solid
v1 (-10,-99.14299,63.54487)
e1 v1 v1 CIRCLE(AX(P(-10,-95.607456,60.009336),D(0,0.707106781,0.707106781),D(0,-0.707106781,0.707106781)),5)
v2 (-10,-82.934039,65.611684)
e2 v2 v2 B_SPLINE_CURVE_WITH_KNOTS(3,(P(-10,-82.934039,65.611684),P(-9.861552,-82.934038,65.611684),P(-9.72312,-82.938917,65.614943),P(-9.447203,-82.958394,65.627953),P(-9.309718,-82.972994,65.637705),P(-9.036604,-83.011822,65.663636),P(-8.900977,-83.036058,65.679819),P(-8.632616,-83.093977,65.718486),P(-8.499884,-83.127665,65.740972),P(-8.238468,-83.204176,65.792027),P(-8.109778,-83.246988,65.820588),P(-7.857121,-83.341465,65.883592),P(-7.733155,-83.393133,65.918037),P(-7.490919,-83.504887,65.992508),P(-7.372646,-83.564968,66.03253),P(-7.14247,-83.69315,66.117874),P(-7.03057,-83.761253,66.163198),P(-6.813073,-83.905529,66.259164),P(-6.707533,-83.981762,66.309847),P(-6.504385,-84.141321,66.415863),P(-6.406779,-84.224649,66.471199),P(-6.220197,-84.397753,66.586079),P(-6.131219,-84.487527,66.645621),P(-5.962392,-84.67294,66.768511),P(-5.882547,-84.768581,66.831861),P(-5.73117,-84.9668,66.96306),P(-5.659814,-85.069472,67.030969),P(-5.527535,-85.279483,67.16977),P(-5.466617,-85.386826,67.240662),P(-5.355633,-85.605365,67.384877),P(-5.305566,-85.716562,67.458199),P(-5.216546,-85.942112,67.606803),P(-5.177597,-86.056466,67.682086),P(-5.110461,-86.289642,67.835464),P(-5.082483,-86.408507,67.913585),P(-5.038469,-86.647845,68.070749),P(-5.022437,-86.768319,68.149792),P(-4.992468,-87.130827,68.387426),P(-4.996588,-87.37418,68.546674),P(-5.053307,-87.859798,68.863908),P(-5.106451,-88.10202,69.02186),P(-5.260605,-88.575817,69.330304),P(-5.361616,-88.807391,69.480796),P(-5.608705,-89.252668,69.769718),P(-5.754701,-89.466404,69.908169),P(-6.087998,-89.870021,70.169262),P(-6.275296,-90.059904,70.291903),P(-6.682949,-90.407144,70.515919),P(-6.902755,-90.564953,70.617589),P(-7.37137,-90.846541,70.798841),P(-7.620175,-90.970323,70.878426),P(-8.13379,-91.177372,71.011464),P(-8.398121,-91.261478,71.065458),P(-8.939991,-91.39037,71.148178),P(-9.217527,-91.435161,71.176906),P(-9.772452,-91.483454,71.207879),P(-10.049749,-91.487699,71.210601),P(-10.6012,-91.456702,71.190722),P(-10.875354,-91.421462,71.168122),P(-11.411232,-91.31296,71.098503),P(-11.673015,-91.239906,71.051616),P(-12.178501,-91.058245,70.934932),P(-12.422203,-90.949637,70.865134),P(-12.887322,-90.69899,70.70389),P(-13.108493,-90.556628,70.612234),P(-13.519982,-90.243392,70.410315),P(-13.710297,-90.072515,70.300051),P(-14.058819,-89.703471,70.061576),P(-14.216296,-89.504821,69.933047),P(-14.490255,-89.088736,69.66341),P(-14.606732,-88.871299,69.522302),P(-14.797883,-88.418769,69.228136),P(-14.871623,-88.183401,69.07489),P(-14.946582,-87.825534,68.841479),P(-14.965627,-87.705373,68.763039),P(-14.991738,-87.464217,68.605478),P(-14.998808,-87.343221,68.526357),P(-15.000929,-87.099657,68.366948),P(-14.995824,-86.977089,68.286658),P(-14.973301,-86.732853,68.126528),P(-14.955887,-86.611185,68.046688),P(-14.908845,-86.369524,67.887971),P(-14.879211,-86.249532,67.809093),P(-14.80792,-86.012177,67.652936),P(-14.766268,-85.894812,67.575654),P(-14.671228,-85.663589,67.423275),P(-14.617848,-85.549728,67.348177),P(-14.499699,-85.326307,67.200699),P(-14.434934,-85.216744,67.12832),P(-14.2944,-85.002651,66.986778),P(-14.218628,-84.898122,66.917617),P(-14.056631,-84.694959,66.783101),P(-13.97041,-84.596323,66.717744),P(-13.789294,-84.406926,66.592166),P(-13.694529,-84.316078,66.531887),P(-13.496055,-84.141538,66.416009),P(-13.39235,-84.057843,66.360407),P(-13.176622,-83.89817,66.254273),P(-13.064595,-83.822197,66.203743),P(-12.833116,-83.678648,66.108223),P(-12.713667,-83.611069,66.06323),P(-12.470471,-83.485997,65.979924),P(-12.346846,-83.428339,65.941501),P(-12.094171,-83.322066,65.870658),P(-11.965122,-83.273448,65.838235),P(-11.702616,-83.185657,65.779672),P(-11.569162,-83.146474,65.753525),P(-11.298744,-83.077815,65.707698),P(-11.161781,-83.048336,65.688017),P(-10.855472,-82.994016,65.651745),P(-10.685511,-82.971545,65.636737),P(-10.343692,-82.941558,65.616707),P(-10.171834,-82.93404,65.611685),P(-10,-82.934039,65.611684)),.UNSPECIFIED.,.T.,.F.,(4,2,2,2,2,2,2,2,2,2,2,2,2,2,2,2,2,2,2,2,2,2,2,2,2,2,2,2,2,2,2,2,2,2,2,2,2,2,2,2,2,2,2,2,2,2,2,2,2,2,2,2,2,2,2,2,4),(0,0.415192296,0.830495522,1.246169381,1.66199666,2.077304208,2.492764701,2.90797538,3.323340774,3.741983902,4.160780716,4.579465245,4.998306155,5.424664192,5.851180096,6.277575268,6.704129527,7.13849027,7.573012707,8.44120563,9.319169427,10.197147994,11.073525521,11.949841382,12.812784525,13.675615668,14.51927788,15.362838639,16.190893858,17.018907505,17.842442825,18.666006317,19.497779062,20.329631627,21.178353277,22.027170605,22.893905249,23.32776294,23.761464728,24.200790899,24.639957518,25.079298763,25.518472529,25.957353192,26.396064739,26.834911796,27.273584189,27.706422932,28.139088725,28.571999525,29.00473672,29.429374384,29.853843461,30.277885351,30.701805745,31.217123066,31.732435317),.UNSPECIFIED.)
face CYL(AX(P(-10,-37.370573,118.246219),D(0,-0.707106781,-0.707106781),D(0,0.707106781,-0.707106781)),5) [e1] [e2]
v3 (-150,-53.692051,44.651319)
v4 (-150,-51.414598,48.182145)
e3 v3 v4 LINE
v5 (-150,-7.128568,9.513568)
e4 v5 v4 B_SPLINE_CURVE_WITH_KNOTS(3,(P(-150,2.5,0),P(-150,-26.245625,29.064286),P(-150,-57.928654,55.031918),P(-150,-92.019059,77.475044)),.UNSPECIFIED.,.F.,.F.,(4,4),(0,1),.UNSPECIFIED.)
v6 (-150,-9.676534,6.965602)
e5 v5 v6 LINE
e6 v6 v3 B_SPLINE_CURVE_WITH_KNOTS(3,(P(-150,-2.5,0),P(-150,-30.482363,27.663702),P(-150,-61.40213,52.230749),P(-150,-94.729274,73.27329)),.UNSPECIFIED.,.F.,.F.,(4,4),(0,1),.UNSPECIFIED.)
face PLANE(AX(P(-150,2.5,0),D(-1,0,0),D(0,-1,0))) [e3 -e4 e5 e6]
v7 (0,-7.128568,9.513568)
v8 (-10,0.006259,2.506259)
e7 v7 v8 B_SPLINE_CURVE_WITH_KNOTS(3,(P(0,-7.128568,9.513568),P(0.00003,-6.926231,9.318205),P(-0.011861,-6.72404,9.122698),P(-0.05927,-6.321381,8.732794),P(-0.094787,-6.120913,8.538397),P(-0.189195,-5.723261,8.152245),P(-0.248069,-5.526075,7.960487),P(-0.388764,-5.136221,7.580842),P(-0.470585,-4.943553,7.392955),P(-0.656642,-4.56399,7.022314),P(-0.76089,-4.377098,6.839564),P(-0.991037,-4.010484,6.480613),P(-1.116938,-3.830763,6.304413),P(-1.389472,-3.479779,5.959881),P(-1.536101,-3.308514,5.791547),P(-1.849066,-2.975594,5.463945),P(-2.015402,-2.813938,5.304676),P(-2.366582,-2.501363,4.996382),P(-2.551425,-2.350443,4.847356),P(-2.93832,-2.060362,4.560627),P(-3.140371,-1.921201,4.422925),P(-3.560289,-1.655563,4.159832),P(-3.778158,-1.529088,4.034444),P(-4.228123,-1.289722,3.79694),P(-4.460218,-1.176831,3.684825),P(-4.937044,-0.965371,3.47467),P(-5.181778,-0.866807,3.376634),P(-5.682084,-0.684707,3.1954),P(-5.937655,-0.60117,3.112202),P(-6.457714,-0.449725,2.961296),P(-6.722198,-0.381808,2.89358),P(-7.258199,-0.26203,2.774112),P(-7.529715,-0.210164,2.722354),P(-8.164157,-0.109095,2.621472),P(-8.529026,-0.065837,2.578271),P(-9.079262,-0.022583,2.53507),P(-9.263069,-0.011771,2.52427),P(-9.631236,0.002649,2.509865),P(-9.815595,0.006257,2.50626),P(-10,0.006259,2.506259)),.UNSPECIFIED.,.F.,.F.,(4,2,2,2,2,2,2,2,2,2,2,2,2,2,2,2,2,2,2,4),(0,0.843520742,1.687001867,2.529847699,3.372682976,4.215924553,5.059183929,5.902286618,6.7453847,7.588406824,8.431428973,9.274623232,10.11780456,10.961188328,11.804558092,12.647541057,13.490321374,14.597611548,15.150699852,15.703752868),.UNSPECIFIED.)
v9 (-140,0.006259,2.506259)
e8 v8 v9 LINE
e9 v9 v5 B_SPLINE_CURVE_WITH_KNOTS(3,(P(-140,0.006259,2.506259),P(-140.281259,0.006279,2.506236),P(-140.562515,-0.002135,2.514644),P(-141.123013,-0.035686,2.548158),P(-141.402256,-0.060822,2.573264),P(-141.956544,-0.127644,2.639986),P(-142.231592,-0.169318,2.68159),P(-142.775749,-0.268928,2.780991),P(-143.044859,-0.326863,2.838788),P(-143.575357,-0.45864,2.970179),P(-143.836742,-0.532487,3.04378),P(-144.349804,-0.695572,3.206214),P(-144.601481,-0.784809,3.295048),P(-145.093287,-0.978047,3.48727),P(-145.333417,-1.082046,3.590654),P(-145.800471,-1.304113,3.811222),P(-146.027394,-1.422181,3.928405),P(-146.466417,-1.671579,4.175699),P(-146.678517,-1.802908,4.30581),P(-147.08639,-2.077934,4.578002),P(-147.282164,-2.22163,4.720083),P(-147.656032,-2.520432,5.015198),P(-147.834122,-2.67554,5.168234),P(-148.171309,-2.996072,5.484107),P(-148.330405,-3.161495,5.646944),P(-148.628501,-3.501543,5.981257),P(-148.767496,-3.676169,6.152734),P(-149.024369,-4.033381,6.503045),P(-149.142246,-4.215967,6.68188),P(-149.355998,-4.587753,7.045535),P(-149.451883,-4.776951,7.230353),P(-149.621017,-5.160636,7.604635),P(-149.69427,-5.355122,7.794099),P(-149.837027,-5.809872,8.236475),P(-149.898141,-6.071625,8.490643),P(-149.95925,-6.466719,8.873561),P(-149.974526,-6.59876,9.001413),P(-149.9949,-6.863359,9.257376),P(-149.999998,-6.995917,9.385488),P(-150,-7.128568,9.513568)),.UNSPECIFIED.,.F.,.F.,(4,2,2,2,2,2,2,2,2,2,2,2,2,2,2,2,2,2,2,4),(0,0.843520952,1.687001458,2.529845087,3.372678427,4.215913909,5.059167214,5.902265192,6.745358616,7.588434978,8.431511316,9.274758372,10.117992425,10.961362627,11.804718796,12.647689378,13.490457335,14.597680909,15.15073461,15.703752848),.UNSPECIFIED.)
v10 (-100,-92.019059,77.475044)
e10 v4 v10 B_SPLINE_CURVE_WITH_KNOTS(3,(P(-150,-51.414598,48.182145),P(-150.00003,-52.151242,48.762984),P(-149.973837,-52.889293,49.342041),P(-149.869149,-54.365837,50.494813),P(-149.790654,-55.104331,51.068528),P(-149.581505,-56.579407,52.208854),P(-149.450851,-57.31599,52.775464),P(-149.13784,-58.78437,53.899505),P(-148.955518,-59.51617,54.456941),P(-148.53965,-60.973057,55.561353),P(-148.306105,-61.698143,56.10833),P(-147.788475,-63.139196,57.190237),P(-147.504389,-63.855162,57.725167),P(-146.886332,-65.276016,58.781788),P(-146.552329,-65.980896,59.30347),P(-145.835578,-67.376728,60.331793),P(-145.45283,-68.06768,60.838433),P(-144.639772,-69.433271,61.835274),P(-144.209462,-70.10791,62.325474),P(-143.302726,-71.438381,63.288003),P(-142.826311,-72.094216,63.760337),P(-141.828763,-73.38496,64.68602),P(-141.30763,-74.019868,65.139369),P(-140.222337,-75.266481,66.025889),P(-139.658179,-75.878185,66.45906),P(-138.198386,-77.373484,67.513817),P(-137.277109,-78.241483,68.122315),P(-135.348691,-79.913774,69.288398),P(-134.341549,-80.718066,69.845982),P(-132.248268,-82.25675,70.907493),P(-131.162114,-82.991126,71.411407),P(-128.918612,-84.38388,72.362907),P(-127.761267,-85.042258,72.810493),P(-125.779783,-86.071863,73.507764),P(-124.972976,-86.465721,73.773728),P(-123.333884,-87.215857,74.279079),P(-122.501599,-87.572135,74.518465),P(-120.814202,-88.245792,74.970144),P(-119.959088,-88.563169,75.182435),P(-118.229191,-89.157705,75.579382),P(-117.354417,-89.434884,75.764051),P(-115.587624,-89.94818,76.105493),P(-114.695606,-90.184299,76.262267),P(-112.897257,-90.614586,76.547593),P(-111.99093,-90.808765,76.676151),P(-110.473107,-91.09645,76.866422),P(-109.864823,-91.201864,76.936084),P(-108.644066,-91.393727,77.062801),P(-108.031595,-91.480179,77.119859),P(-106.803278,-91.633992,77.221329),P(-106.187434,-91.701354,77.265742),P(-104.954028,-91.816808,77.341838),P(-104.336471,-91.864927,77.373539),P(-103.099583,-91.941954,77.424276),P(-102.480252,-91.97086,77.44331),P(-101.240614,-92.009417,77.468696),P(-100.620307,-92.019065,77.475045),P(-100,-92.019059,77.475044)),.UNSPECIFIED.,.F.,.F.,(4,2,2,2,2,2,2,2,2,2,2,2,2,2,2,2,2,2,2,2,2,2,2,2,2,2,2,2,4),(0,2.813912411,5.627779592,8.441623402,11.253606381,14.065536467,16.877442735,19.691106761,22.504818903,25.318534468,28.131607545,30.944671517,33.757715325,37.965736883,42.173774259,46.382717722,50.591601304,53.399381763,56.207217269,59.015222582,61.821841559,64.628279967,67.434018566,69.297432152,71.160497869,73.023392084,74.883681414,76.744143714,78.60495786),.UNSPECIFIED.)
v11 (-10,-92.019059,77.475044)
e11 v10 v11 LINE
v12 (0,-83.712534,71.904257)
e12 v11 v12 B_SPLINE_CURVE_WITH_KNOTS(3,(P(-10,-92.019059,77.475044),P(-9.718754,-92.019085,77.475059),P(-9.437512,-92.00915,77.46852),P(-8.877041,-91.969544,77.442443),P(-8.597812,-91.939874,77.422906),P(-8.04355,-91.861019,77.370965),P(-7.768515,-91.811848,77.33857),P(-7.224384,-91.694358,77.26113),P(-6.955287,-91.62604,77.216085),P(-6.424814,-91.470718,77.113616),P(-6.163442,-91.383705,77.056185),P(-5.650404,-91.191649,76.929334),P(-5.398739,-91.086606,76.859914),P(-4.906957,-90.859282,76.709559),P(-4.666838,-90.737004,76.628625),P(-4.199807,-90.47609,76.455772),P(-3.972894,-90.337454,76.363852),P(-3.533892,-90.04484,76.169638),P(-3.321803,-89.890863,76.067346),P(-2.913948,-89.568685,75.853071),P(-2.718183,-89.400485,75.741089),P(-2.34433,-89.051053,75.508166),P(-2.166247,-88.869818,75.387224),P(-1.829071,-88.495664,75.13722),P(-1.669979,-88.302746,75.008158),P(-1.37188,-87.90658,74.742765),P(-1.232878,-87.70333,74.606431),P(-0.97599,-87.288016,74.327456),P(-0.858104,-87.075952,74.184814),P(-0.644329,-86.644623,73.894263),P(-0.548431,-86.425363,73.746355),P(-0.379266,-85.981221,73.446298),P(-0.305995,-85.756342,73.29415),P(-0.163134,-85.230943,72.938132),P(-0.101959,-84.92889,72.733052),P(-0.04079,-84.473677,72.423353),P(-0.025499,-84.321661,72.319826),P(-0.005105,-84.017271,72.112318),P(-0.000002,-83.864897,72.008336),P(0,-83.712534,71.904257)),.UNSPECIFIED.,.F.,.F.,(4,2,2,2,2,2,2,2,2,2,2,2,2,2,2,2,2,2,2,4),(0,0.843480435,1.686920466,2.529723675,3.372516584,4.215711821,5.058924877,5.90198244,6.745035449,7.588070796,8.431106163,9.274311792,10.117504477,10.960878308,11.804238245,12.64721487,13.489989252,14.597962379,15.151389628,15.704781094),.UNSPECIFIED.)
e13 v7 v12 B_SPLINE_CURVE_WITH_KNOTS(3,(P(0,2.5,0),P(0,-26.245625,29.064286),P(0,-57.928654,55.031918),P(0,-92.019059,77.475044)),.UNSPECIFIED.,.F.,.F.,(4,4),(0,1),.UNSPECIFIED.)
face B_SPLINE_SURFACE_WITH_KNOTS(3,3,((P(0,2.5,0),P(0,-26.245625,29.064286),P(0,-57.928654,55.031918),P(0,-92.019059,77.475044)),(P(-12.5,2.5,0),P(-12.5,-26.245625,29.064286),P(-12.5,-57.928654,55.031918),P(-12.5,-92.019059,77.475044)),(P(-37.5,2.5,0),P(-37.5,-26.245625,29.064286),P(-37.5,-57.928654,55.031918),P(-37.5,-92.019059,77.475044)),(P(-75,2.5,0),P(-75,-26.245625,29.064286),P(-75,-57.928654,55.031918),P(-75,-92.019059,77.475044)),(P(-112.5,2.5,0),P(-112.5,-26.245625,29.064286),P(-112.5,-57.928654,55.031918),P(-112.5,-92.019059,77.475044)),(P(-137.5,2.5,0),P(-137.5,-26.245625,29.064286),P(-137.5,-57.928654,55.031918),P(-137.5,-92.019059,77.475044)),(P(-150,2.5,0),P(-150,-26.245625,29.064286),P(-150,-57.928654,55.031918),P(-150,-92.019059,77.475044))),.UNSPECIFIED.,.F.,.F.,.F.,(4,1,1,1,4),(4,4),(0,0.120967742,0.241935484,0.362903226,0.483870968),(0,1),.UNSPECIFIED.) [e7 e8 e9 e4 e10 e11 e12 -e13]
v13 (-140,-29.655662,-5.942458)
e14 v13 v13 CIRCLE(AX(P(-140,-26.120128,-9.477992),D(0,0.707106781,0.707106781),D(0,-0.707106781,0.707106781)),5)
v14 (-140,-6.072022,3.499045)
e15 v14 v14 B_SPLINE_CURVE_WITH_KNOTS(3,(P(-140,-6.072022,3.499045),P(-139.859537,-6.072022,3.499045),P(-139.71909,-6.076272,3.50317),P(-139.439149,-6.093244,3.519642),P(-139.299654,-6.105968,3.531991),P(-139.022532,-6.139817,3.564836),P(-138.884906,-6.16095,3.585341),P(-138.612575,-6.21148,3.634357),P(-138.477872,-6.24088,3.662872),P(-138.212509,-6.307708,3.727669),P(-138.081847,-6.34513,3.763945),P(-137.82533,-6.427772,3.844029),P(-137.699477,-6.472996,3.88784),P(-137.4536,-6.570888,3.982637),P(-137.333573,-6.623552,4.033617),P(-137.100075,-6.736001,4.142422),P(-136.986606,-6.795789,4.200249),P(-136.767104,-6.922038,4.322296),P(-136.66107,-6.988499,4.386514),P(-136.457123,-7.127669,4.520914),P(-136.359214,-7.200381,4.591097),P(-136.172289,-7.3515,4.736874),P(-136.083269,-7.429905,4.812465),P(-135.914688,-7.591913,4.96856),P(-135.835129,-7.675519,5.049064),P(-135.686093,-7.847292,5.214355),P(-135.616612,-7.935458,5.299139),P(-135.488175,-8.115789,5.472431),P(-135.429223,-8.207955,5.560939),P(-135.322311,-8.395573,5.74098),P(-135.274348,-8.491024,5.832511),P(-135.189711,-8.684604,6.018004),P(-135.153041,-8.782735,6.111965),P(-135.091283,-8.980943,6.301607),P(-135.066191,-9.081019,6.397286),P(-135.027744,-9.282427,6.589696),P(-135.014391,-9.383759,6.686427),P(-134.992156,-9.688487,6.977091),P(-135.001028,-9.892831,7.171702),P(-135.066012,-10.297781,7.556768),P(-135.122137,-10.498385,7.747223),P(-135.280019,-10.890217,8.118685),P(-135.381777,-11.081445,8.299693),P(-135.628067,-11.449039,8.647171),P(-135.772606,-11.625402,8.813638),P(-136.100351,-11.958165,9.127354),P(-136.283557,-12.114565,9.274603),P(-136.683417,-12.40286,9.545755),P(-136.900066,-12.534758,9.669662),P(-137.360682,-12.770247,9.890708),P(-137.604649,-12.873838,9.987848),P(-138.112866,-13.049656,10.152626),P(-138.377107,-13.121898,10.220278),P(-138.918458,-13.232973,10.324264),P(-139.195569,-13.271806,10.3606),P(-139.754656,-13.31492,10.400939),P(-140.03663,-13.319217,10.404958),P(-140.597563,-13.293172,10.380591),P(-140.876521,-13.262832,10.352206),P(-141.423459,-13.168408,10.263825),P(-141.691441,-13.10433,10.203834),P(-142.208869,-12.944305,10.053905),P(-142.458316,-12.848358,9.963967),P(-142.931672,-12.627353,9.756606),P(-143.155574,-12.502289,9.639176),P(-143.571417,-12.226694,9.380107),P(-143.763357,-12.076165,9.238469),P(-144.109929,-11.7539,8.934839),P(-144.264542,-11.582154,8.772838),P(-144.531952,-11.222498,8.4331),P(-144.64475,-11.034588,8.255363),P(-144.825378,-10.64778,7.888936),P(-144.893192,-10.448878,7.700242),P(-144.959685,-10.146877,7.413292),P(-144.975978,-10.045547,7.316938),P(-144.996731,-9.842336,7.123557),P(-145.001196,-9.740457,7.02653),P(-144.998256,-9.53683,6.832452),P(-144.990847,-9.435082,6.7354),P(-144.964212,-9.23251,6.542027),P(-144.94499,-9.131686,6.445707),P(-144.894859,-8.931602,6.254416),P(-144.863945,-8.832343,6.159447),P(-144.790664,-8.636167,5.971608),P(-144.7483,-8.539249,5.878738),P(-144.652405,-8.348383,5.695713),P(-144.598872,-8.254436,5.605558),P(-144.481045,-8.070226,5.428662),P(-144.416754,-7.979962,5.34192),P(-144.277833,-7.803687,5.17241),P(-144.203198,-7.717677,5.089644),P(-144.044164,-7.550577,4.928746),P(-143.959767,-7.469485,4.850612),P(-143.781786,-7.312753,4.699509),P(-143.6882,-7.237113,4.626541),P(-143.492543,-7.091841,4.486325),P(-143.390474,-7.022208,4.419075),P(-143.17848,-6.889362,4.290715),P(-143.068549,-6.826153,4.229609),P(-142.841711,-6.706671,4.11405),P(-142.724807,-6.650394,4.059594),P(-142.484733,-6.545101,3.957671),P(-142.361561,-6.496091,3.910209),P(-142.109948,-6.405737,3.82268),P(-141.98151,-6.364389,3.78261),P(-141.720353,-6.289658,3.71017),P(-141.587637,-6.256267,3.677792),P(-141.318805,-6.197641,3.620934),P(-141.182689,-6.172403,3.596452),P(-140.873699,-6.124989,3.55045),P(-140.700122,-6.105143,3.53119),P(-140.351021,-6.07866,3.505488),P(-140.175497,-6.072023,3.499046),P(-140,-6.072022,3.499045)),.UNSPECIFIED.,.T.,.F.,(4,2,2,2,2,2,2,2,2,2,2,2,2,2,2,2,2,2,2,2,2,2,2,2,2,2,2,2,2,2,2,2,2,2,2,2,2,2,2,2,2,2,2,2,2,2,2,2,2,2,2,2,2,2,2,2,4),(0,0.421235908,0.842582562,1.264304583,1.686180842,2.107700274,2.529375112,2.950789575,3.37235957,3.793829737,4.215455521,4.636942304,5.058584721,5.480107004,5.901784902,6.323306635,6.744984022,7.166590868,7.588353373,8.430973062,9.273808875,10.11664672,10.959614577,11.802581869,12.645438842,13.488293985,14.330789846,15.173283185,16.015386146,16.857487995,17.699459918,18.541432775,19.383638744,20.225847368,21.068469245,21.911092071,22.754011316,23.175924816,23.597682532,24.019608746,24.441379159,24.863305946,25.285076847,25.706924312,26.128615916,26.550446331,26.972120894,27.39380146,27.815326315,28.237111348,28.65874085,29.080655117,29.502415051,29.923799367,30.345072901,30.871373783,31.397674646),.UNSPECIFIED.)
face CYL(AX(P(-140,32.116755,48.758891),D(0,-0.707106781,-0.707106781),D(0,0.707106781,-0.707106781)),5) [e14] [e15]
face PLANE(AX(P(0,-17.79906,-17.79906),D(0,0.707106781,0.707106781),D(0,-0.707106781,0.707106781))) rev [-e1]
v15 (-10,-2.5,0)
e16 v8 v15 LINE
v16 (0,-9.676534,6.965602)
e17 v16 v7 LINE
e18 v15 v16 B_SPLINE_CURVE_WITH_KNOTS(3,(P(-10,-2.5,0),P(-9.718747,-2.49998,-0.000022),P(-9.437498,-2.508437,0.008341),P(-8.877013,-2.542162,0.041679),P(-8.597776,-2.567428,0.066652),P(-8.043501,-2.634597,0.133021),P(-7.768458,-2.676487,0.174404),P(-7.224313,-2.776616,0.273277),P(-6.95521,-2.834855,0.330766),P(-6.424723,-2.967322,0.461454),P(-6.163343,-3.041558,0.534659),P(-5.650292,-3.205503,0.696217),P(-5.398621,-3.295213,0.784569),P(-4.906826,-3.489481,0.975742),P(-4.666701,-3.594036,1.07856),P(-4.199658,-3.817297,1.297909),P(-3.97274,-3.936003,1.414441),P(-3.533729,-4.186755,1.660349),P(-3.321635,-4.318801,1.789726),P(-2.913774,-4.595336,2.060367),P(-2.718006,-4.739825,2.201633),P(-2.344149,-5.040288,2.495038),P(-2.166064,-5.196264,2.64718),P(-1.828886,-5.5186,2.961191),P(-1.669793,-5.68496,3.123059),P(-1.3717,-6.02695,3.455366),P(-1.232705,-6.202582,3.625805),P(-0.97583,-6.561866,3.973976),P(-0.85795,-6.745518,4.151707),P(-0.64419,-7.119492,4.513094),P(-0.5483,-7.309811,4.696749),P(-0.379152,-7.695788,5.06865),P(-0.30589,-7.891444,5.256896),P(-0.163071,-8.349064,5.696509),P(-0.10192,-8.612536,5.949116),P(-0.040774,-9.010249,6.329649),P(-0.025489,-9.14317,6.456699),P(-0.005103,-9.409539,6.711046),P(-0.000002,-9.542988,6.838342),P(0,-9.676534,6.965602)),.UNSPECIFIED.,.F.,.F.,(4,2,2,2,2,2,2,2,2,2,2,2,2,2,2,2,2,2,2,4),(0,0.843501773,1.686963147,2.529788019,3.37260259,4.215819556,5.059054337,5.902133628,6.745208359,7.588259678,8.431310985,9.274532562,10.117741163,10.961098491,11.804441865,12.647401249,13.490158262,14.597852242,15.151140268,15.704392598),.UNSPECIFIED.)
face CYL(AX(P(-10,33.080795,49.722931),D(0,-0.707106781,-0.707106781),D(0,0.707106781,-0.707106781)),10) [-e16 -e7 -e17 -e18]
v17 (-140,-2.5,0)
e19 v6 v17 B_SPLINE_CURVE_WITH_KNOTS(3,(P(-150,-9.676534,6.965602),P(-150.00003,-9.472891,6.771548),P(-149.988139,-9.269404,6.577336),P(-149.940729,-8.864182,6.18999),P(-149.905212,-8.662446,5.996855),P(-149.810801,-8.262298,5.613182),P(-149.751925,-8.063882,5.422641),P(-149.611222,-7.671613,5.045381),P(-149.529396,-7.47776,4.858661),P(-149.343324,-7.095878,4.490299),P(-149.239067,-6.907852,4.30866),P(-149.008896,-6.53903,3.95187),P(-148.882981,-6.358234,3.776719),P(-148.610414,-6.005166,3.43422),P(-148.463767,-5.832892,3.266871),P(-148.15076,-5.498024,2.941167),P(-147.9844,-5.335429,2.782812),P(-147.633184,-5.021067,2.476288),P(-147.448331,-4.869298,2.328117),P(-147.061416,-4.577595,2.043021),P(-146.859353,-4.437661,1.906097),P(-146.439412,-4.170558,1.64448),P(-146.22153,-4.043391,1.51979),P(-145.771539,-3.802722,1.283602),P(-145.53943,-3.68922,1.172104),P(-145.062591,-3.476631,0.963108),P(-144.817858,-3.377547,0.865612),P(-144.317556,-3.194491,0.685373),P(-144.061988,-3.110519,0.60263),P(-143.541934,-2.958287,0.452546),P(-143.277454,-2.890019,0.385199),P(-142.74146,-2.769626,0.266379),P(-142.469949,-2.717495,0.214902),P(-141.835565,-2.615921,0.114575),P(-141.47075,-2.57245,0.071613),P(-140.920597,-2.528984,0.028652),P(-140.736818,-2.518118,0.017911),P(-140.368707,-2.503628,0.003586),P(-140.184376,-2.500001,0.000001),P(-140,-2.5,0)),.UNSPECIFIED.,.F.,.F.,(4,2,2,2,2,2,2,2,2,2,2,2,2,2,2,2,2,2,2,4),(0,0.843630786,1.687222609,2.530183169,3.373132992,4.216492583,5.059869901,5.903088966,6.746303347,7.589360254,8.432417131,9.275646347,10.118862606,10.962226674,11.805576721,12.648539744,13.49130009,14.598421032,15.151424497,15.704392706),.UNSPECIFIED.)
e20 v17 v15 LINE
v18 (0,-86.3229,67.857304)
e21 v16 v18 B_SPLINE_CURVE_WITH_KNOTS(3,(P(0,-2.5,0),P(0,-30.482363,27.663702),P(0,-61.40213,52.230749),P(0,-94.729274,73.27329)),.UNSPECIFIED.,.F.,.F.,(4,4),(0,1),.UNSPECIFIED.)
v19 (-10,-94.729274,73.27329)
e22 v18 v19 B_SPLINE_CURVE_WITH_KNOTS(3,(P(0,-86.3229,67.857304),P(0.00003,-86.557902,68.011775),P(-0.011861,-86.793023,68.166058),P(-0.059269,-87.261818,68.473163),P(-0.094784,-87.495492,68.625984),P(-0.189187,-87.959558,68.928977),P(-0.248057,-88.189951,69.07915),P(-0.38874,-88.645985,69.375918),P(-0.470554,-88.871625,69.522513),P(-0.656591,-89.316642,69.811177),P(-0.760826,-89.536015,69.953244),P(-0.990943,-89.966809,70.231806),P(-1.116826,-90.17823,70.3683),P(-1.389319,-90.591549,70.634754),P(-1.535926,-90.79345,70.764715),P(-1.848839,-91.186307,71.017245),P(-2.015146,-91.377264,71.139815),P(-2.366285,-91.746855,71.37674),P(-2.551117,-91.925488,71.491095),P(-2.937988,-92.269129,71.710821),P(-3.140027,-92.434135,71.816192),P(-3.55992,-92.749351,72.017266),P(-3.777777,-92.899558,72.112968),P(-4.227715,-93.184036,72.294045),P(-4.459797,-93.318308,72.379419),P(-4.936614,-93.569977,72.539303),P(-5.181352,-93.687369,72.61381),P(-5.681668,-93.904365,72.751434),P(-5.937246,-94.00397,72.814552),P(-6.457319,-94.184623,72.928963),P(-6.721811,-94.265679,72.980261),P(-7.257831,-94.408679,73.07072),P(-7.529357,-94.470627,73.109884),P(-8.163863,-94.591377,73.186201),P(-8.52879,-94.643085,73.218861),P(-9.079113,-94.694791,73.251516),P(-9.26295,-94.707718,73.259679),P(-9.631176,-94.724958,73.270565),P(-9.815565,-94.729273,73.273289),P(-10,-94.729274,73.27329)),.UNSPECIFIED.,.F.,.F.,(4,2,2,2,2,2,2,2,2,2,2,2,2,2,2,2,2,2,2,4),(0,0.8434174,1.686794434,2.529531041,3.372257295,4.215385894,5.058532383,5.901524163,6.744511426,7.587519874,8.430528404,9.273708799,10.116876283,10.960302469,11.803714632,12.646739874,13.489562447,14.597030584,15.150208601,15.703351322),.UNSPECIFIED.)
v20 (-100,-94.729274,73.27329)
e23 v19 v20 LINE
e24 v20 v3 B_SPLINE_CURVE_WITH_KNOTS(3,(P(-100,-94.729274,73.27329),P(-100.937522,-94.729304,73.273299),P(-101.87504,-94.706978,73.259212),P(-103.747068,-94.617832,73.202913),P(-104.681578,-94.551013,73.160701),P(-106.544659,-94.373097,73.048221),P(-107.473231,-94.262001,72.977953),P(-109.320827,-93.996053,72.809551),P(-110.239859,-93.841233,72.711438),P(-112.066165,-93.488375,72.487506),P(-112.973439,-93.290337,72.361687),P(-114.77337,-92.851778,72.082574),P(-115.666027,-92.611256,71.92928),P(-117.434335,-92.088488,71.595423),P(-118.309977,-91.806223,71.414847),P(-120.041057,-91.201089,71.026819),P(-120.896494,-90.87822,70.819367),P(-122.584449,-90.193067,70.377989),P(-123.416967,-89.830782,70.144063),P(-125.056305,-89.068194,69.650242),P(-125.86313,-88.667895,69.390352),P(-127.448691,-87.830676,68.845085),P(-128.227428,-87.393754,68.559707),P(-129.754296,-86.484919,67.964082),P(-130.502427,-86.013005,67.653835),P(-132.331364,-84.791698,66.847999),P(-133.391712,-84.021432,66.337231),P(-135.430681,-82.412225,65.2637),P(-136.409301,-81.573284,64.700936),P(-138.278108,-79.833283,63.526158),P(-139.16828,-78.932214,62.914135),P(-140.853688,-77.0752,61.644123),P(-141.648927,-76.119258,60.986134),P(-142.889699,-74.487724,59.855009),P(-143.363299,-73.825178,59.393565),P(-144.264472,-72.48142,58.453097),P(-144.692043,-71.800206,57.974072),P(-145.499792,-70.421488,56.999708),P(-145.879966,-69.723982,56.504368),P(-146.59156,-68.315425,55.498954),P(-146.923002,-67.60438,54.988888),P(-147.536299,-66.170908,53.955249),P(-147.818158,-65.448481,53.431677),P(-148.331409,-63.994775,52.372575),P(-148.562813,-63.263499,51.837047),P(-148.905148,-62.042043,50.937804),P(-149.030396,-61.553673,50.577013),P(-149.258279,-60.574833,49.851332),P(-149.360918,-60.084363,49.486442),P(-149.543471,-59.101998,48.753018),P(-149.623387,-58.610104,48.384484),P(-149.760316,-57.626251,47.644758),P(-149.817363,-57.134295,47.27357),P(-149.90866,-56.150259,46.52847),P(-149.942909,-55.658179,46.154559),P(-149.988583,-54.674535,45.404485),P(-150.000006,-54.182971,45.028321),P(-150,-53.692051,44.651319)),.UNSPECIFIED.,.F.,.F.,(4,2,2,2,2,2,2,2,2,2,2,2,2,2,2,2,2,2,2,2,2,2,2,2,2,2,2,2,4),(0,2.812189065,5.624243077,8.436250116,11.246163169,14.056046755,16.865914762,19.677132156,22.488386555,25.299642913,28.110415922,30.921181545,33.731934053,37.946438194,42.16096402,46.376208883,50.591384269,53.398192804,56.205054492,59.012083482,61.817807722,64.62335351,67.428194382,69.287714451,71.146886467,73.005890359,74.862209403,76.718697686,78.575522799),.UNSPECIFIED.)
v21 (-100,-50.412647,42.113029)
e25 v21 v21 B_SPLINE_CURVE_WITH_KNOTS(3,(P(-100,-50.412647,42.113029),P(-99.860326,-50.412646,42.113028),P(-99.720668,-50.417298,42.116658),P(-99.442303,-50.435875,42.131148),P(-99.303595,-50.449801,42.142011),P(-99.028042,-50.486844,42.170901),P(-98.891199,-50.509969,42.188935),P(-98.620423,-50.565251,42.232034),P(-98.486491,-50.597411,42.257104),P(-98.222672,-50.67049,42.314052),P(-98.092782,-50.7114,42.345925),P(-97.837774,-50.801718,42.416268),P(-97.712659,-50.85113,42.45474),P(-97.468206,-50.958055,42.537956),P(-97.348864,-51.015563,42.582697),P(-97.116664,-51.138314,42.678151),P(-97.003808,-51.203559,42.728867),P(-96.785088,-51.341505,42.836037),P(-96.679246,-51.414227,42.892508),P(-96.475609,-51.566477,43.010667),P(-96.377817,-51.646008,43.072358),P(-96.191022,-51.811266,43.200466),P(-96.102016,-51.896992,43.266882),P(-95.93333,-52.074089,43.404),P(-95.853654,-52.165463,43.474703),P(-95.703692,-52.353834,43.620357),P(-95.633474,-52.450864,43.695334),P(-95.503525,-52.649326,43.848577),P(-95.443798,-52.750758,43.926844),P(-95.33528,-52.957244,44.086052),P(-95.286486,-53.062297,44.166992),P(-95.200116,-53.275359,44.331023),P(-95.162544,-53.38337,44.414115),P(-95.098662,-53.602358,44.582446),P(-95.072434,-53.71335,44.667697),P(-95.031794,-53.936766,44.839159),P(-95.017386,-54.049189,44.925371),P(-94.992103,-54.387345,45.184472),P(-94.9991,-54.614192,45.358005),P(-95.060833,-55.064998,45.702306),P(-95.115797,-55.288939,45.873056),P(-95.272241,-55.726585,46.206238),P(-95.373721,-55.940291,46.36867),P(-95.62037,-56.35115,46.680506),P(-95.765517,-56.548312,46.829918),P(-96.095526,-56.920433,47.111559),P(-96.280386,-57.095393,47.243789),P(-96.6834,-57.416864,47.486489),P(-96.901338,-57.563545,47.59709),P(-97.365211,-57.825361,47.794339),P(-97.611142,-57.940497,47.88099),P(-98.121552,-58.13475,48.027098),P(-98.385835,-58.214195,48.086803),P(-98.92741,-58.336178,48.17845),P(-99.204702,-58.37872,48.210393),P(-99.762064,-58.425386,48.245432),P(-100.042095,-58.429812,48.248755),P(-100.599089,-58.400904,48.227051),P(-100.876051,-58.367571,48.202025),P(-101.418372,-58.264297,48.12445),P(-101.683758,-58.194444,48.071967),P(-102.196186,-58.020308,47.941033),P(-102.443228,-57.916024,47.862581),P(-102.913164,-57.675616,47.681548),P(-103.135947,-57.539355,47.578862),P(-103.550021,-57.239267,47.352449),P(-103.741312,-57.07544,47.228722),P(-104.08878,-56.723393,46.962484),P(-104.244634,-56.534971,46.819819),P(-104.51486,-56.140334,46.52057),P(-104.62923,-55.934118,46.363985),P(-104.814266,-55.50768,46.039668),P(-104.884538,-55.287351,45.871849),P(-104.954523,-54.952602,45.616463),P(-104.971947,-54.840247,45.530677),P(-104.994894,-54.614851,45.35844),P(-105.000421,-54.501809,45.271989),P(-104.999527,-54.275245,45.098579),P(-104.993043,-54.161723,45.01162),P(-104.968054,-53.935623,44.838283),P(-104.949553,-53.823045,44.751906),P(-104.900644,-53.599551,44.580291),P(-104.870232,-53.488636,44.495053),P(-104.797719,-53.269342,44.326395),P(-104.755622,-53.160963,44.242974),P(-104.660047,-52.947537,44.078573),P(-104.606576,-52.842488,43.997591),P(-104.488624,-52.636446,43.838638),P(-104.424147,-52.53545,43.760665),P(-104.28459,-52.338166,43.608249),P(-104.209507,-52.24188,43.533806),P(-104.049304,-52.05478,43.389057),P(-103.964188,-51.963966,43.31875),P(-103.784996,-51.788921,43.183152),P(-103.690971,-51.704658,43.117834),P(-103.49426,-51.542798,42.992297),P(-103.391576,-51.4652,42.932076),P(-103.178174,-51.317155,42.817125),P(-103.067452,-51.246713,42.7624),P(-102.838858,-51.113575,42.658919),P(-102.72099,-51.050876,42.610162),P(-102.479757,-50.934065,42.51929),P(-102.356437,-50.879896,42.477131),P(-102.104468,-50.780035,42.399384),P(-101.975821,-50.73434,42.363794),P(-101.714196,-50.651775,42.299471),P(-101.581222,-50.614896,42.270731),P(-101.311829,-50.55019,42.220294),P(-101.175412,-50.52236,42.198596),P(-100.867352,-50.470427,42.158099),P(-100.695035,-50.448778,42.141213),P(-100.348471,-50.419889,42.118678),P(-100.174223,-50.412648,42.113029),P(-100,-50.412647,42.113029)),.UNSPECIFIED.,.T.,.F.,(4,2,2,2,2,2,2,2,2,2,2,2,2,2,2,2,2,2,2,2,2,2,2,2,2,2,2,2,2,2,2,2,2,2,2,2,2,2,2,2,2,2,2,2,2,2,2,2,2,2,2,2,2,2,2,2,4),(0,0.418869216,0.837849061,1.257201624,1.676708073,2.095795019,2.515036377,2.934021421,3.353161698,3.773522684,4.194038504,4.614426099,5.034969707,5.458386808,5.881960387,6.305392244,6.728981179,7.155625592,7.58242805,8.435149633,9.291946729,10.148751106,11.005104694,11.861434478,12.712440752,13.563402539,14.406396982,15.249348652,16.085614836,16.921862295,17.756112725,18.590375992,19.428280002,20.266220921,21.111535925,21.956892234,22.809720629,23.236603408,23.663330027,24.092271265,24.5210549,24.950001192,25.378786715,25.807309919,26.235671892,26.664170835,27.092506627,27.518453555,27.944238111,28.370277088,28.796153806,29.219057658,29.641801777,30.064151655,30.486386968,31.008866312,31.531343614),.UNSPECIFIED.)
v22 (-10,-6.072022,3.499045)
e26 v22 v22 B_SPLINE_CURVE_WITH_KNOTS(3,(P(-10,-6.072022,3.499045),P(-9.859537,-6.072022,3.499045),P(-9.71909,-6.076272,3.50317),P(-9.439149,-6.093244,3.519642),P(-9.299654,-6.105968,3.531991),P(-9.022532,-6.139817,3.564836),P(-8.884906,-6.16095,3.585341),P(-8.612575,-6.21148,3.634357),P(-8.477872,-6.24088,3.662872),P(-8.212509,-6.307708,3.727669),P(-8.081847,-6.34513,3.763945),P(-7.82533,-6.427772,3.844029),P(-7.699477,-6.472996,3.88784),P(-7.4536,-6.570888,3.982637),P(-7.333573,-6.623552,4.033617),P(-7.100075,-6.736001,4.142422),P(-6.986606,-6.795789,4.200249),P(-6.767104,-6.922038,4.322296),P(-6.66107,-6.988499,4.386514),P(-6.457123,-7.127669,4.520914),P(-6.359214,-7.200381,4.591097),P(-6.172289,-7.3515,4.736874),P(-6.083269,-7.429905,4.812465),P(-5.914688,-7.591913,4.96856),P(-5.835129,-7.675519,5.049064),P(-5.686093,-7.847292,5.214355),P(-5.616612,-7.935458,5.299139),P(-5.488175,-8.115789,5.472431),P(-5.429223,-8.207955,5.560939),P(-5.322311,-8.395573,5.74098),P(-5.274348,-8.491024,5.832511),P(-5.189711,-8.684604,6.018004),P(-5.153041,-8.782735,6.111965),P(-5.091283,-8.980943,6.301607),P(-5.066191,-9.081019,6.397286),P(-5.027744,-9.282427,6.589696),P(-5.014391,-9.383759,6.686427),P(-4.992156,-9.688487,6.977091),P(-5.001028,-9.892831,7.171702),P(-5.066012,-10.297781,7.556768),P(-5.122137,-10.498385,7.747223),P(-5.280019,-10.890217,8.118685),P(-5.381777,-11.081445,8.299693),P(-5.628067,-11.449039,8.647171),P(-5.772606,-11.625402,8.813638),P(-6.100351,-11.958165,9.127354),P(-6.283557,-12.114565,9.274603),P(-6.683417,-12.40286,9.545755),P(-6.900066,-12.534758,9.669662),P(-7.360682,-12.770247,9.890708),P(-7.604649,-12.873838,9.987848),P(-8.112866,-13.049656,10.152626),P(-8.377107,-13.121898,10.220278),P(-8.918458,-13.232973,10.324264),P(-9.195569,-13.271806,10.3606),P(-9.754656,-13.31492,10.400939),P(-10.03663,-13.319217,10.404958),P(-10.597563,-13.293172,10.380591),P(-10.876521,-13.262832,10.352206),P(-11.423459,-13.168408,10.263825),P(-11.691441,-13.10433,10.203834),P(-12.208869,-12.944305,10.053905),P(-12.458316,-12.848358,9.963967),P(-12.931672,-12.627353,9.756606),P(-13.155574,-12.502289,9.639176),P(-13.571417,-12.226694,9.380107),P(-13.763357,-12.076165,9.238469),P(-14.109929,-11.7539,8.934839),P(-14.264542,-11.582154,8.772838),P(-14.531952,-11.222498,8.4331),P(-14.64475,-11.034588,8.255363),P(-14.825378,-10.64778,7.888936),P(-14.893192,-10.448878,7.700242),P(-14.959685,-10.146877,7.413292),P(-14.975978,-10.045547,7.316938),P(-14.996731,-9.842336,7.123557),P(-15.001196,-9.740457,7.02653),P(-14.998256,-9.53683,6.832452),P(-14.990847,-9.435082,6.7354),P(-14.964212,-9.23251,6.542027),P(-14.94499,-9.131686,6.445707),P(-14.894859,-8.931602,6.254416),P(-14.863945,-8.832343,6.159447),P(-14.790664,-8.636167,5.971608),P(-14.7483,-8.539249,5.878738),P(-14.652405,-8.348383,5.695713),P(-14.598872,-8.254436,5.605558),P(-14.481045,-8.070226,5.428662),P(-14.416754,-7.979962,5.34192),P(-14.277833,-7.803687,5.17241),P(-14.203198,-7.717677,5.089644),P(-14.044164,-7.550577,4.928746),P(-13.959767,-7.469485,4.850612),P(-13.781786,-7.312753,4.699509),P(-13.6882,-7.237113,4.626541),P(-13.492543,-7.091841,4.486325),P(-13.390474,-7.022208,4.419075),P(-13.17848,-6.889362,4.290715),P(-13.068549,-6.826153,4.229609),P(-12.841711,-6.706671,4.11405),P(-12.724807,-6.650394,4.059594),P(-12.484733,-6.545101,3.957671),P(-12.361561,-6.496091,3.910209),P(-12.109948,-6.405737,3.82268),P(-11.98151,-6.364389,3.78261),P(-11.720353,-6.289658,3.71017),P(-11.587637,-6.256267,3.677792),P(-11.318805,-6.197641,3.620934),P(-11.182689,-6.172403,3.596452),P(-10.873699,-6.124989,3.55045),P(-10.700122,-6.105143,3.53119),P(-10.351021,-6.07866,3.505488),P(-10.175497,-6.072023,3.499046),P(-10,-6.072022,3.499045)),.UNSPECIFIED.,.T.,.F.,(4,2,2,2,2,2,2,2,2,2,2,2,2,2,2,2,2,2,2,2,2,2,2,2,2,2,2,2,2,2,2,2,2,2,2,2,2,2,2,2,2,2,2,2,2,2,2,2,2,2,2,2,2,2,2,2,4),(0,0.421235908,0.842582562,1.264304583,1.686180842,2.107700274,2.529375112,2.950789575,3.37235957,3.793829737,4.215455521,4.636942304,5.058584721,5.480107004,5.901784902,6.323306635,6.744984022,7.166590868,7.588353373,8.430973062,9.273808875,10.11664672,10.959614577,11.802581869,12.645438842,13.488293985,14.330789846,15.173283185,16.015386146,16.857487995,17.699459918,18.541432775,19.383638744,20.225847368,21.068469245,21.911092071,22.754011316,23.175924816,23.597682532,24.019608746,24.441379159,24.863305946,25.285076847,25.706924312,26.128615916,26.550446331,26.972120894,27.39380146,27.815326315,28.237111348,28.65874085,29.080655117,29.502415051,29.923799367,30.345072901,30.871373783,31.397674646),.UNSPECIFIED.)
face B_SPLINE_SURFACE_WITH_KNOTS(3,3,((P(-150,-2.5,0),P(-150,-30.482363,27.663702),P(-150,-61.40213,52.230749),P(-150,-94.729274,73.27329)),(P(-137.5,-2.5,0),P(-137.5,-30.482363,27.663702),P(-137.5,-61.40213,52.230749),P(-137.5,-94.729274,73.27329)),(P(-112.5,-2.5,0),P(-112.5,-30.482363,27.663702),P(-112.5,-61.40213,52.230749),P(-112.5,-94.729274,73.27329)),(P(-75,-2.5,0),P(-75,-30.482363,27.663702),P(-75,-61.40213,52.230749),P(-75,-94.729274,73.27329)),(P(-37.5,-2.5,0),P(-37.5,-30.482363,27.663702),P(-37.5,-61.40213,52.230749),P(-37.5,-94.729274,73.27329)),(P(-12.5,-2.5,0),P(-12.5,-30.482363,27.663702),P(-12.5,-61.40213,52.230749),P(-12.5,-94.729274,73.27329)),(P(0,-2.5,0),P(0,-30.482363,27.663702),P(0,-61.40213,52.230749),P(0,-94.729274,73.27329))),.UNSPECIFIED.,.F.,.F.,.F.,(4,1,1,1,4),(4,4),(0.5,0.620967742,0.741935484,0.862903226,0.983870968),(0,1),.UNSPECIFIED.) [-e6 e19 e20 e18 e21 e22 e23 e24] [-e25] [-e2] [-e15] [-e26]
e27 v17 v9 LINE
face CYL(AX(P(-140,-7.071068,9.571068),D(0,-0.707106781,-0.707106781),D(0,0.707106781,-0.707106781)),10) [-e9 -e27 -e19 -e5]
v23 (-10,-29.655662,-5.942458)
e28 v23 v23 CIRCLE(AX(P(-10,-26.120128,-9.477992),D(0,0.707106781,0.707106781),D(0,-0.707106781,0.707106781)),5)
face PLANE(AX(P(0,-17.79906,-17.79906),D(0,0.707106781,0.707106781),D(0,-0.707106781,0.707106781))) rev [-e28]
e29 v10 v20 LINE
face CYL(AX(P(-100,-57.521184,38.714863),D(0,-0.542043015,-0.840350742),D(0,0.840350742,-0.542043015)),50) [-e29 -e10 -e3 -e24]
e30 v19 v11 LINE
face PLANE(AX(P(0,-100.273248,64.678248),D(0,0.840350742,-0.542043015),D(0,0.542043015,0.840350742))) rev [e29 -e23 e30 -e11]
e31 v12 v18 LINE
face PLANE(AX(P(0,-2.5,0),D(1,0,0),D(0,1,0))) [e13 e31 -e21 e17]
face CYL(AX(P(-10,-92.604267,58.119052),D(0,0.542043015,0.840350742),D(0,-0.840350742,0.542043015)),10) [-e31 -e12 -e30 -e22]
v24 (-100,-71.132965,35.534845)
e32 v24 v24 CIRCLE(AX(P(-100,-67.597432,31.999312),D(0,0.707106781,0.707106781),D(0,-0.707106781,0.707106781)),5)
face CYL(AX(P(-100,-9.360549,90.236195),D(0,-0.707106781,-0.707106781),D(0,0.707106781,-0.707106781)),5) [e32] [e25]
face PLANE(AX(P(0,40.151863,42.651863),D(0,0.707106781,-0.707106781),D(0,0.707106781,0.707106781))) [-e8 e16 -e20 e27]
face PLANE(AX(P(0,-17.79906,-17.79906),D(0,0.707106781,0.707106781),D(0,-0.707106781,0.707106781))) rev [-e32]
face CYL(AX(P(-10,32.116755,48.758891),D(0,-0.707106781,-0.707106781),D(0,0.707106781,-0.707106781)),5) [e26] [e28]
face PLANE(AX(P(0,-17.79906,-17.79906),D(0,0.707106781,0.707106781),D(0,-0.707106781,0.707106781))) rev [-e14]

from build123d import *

# Parameters (mm, degrees)
LOFT_START          = -150
LOFT_18_DEPTH       = 150
FILLET_1_R          = 50
SKETCH_8_W          = 150
SKETCH_8_H          = 89.90044461
CUT_EXTRUDE_3_DEPTH = 194.637322649
FILLET_3_R          = 10
EXTRUDE_1_REACH     = 195.637
SKETCH_5_R          = 5


# Read off the part's stored shape, not the designer's step: 放样18
with BuildPart() as part:
    # 放样18 outline → 放样18 (new body)
    with BuildSketch(Plane.YZ.offset(LOFT_START)):
        with BuildLine():
            Line((-92.019059125, 77.475043518), (-94.7292742, 73.273289807))
            add(Edge.make_bspline(
                [(-2.5, 0), (-30.482362978, 27.663701514), (-61.402130233, 52.230749004), (-94.7292742, 73.273289807)],
                knots=[0, 0, 0, 0, 1, 1, 1, 1], degree=3))
            Line((-2.5, 0), (2.5, 0))
            add(Edge.make_bspline(
                [(2.5, 0), (-26.24562462, 29.064286084), (-57.928653516, 55.031918144), (-92.019059125, 77.475043518)],
                knots=[0, 0, 0, 0, 1, 1, 1, 1], degree=3))
        make_face()
    extrude(amount=LOFT_18_DEPTH)

    # 圆角1
    fillet_1_edges = [part.edges().sort_by_distance(p)[0] for p in [
        (-150, -93.374166663, 75.374166663),
    ]]
    fillet(fillet_1_edges, radius=FILLET_1_R)

    # 草图8 → 切除-拉伸3 (cut, through all)
    with BuildSketch(Plane(origin=(0, -17.799060008, -17.799060008), x_dir=(-1, 0, 0), z_dir=(0, 0.7071067811865488, 0.7071067811865464))):
        with Locations((75, -43.182455352)):
            Rectangle(SKETCH_8_W, SKETCH_8_H)
    extrude(amount=CUT_EXTRUDE_3_DEPTH, mode=Mode.SUBTRACT)

    # 圆角3
    fillet_3_edges = [part.edges().sort_by_distance(p)[0] for p in [
        (0, -93.374166663, 75.374166663),
        (0, -1.246870677, 1.253129323),
        (-150, -1.246870677, 1.253129323),
    ]]
    fillet(fillet_3_edges, radius=FILLET_3_R)

    # 草图5 → 凸台-拉伸1 (add, up to next)
    with BuildSketch(Plane(origin=(0, -17.799060008, -17.799060008), x_dir=(-1, 0, 0), z_dir=(0, 0.7071067811865488, 0.7071067811865464)), mode=Mode.PRIVATE) as extrude_1_sk1:
        with Locations(Location((140, 11.767766953, 0), (0, 0, 270))):
            Circle(SKETCH_5_R)
    extrude_1_tool1 = extrude(extrude_1_sk1.sketch, amount=EXTRUDE_1_REACH, mode=Mode.PRIVATE) - part.part
    # 草图5 → 凸台-拉伸1 (add, up to next)
    with BuildSketch(Plane(origin=(0, -17.799060008, -17.799060008), x_dir=(-1, 0, 0), z_dir=(0, 0.7071067811865488, 0.7071067811865464)), mode=Mode.PRIVATE) as extrude_1_sk2:
        with Locations(Location((10, 11.767766953, 0), (0, 0, 270))):
            Circle(SKETCH_5_R)
    extrude_1_tool2 = extrude(extrude_1_sk2.sketch, amount=EXTRUDE_1_REACH, mode=Mode.PRIVATE) - part.part
    # 草图5 → 凸台-拉伸1 (add, up to next)
    with BuildSketch(Plane(origin=(0, -17.799060008, -17.799060008), x_dir=(-1, 0, 0), z_dir=(0, 0.7071067811865488, 0.7071067811865464)), mode=Mode.PRIVATE) as extrude_1_sk3:
        with Locations(Location((10, 110.037688609, 0), (0, 0, 270))):
            Circle(SKETCH_5_R)
    extrude_1_tool3 = extrude(extrude_1_sk3.sketch, amount=EXTRUDE_1_REACH, mode=Mode.PRIVATE) - part.part
    # 草图5 → 凸台-拉伸1 (add, up to next)
    with BuildSketch(Plane(origin=(0, -17.799060008, -17.799060008), x_dir=(-1, 0, 0), z_dir=(0, 0.7071067811865488, 0.7071067811865464)), mode=Mode.PRIVATE) as extrude_1_sk4:
        with Locations(Location((100, 70.425532461, 0), (0, 0, 270))):
            Circle(SKETCH_5_R)
    extrude_1_tool4 = extrude(extrude_1_sk4.sketch, amount=EXTRUDE_1_REACH, mode=Mode.PRIVATE) - part.part
    add(extrude_1_tool1.solids().sort_by_distance((-140, -26.120128, -9.477992))[0])
    add(extrude_1_tool2.solids().sort_by_distance((-10, -26.120128, -9.477992))[0])
    add(extrude_1_tool3.solids().sort_by_distance((-10, -95.607456, 60.009336))[0])
    add(extrude_1_tool4.solids().sort_by_distance((-100, -67.597432, 31.999312))[0])


solid = part.part
